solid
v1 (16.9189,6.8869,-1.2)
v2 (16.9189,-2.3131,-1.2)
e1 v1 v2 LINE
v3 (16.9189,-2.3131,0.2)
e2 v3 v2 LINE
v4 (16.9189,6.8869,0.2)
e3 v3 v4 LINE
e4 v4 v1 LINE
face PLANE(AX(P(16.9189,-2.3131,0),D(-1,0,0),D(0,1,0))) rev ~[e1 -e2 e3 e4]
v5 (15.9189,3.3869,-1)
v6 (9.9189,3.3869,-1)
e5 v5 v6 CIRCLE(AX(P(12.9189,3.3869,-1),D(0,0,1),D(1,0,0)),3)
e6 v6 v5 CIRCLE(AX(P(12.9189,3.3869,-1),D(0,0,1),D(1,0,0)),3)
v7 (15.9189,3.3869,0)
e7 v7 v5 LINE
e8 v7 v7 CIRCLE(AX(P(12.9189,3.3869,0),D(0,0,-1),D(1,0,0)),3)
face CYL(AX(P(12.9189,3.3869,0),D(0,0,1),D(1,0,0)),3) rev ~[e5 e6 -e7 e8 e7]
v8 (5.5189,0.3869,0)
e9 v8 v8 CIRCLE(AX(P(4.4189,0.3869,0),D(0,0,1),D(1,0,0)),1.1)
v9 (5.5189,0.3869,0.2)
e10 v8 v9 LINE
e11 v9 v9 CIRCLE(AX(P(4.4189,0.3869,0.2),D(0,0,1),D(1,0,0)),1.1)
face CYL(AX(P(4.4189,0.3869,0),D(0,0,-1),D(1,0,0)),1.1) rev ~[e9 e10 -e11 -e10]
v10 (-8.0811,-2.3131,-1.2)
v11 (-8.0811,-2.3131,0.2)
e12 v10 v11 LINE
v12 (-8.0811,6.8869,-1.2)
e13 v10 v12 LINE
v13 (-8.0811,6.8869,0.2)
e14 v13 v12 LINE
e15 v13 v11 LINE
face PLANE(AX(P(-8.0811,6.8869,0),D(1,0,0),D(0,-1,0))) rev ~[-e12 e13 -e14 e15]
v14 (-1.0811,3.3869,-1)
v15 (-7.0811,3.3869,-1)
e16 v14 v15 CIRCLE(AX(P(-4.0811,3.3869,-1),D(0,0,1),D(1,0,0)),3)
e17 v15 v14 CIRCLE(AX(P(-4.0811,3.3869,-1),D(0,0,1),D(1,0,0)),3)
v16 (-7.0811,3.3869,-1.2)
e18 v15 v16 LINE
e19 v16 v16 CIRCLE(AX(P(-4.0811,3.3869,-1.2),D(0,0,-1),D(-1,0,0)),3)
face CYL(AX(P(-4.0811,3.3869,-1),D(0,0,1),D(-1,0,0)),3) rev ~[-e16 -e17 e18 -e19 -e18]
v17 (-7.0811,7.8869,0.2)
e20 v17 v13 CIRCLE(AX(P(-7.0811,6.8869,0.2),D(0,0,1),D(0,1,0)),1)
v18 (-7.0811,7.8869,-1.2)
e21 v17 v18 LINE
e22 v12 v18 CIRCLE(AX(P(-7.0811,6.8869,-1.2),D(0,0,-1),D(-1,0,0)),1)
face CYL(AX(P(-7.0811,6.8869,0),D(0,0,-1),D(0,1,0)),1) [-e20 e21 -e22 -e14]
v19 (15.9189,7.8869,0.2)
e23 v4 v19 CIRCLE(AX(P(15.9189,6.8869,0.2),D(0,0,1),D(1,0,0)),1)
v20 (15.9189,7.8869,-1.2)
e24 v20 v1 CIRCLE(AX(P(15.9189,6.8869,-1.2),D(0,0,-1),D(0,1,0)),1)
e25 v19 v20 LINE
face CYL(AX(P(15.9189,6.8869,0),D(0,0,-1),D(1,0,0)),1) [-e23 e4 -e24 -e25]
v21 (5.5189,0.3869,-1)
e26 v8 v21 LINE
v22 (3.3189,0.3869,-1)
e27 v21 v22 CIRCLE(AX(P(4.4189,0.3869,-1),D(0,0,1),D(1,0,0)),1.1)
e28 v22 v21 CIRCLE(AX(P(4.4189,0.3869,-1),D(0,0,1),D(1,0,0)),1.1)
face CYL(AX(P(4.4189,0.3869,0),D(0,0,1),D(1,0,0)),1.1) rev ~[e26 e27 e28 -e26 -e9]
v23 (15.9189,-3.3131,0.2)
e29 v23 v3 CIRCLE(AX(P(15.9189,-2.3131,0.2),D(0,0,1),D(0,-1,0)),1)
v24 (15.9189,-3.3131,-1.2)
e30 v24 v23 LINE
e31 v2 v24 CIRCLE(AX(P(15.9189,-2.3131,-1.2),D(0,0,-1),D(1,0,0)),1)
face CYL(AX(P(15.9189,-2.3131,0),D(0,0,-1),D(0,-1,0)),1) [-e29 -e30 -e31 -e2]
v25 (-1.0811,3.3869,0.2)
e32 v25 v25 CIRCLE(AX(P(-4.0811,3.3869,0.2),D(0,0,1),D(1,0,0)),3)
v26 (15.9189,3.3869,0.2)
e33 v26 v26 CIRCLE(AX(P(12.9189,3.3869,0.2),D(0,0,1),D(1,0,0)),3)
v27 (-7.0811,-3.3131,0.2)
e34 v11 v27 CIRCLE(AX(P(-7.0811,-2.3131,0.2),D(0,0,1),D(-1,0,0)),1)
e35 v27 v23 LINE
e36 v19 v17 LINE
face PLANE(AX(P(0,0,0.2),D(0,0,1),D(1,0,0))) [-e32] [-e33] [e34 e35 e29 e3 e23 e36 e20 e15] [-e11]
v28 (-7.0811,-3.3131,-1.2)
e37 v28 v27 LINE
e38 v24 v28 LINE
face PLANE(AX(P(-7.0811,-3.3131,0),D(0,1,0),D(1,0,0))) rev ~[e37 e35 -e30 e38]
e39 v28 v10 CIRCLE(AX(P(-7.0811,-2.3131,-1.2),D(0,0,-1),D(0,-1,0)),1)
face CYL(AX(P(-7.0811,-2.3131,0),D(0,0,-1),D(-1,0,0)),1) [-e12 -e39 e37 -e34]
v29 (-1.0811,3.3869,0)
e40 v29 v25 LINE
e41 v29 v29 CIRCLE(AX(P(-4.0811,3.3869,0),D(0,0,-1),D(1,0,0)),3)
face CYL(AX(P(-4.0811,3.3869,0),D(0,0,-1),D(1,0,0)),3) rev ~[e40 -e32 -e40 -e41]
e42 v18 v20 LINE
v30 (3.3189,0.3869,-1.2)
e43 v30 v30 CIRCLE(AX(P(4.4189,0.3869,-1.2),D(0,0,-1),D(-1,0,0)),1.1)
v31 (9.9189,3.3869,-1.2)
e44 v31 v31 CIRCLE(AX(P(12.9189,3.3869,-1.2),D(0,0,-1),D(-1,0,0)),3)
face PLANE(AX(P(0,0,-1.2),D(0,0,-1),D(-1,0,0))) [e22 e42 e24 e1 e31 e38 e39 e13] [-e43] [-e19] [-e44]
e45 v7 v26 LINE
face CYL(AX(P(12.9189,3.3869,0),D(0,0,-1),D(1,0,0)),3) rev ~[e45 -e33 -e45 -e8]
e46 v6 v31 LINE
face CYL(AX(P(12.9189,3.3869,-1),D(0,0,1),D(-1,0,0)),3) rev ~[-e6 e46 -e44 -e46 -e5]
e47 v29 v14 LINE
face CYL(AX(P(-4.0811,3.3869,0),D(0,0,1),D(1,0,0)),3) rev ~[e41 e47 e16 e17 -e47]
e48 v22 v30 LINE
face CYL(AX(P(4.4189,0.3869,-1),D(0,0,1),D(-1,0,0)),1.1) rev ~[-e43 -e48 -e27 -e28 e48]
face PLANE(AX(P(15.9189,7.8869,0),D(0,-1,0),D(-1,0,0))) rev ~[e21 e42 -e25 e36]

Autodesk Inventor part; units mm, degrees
ref_plane "YZ Plane" through (0, 0, 0) normal (1, 0, 0) x (0, 1, 0)
ref_plane "XZ Plane" through (0, 0, 0) normal (0, 1, 0) x (-1, 0, 0)
ref_plane "XY Plane" through (0, 0, 0) normal (0, 0, 1) x (1, 0, 0)
sketch "Sketch1" plane through (0, 0, 0) normal (0, 0, 1) x (1, 0, 0)
  line L0 (-8.0811, -5.1131) -> (16.9189, -5.1131)
  line L1 (16.9189, -5.1131) -> (16.9189, 19.8869)
  line L2 (16.9189, 19.8869) -> (-8.0811, 19.8869)
  line L3 (-8.0811, 19.8869) -> (-8.0811, -5.1131)
  line L4 (-8.0811, -5.1131) -> (-7.0811, -5.1131)
  line L5 (-7.0811, -5.1131) -> (-7.0811, -4.1131)
  line L6 (-7.0811, -4.1131) -> (-8.0811, -4.1131)
  line L7 (-8.0811, -4.1131) -> (-8.0811, -5.1131)
  line L8 (16.9189, 19.8869) -> (15.9189, 19.8869)
  line L9 (15.9189, 19.8869) -> (15.9189, 18.8869)
  line L10 (15.9189, 18.8869) -> (16.9189, 18.8869)
  line L11 (16.9189, 18.8869) -> (16.9189, 19.8869)
  line L12 (-7.0811, -4.1131) -> (15.9189, -4.1131)
  line L13 (15.9189, -4.1131) -> (15.9189, 18.8869)
  line L14 (15.9189, 18.8869) -> (-7.0811, 18.8869)
  line L15 (-7.0811, 18.8869) -> (-7.0811, -4.1131)
  line L16 (-7.0811, -4.1131) -> (-1.0811, -4.1131)
  line L17 (-1.0811, -4.1131) -> (-1.0811, 17.1845)
  line L18 (-1.0811, 17.1845) -> (-7.0811, 17.1845)
  line L19 (-7.0811, 17.1845) -> (-7.0811, -4.1131)
  line L20 (15.9189, -4.1131) -> (9.9189, -4.1131)
  line L21 (9.9189, -4.1131) -> (9.9189, 17.1845)
  line L22 (9.9189, 17.1845) -> (15.9189, 17.1845)
  line L23 (15.9189, 17.1845) -> (15.9189, -4.1131)
  circle A0 centre (4.4189, 0.3869) radius 5.5
  line L24 (4.4189, 0.3869) -> (15.9189, 0.3869)
  line L25 (4.4189, 0.3869) -> (-8.0811, 0.3869)
  circle A1 centre (-4.0811, 3.3869) radius 3
  circle A2 centre (12.9189, 3.3869) radius 3
  circle A3 centre (4.4189, 0.3869) radius 5
  line L26 (4.4189, -4.6131) -> (4.4189, -3.3131)
  line L27 (4.4189, -3.3131) -> (16.9189, -3.3131)
  line L28 (4.4189, -3.3131) -> (-8.0811, -3.3131)
  line L29 (-4.0811, 6.3869) -> (-4.0811, 8.3869)
  line L30 (-4.0811, 8.3869) -> (16.9189, 8.3869)
  line L31 (-4.0811, 8.3869) -> (-8.0811, 8.3869)
  point P0 (0, 0)
  point P1 (0.3495, -3.3131)
  point P2 (8.4883, -3.3131)
  dimension "d8" = 10
  dimension "d0" = 25
  dimension "d1" = 25
  dimension "d2" = 1
  dimension "d3" = 1
  dimension "d4" = 1
  dimension "d5" = 1
  dimension "d6" = 6
  dimension "d7" = 6
  dimension "d9" = 1.3
  dimension "d10" = 2
extrude "Extrusion1" add sketch "Sketch1" against normal blind 1 contours L3 L25 L15 L28 | L15 L25 L17 L28 | L3 L31 L15 L25 | L27 L13 L30 L1 | L28 L17 A0 | A0 L21 L27 | L15 A1 L25 | L27 L21 L24 L13 | L25 A1 L17 | L17 L30 L21 A0 | L21 A2 L24 | L15 L31 L29 A1 | L13 A2 L21 L30 | L24 A2 L13 | A1 L29 L30 L17
sketch "Sketch3" plane through (0, 0, 0) normal (0, 0, 1) x (1, 0, 0)
  line L0 (-8.0811, 8.3869) -> (-8.0811, -3.3131) projected
  line L1 (-8.0811, -3.3131) -> (0.3495, -3.3131) projected
  arc A0 (8.4883, -3.3131) -> (0.3495, -3.3131) centre (4.4189, 0.3869) ccw projected
  line L2 (8.4883, -3.3131) -> (16.9189, -3.3131) projected
  line L3 (16.9189, -3.3131) -> (16.9189, 8.3869) projected
  line L4 (16.9189, 8.3869) -> (-8.0811, 8.3869) projected
  circle A1 centre (12.9189, 3.3869) radius 3 projected
  circle A2 centre (-4.0811, 3.3869) radius 3 projected
  circle A3 centre (4.4189, 0.3869) radius 1.1 projected
  arc A4 (8.4883, -3.3131) -> (0.3495, -3.3131) centre (4.4189, 0.3869) ccw projected
  line L5 (16.9189, -3.3131) -> (8.4883, -3.3131) projected
  line L6 (0.3495, -3.3131) -> (8.4883, -3.3131)
  point P0 (0, 0)
extrude "Extrusion2" add sketch "Sketch3" against normal blind 1 contours A0 L6
sketch "Sketch4" plane through (0, 0, -1) normal (0, 0, -1) x (-1, 0, 0)
  circle A0 centre (-4.4189, 0.3869) radius 1.1 projected
  line L0 (8.0811, -3.3131) -> (8.0811, 8.3869) projected
  line L1 (8.0811, 8.3869) -> (-16.9189, 8.3869) projected
  line L2 (-16.9189, 8.3869) -> (-16.9189, -3.3131) projected
  line L3 (-16.9189, -3.3131) -> (8.0811, -3.3131) projected
  circle A1 centre (-12.9189, 3.3869) radius 3 projected
  circle A2 centre (4.0811, 3.3869) radius 3 projected
  circle A3 centre (-12.9189, 3.3869) radius 4
  line L4 (-16.9189, 8.3869) -> (-16.9189, -3.3131) projected
  line L5 (-12.9189, 7.3869) -> (-12.9189, 8.3869)
  line L6 (-12.9189, 7.8869) -> (-16.9189, 7.8869)
  line L7 (-12.9189, 7.8869) -> (8.0811, 7.8869)
  line L8 (8.0811, -3.3131) -> (8.0811, 8.3869) projected
  point P0 (0, 0)
  point P1 (8.0811, 7.8869)
extrude "Extrusion3" cut sketch "Sketch4" against normal blind 1 contours L7 L5 L1 L0 | L6 L2 L1 L5
fillet "Fillet1" radius 1 4 edges at (16.9189, 7.8869, -0.5) (16.9189, -3.3131, -0.5) (-8.0811, 7.8869, -0.5) (-8.0811, -3.3131, -0.5)
sketch "Sketch5" plane through (0, 0, -1) normal (0, 0, -1) x (-1, 0, 0)
  circle A0 centre (4.0811, 3.3869) radius 3 projected
  circle A1 centre (-12.9189, 3.3869) radius 3 projected
  circle A2 centre (-4.4189, 0.3869) radius 1.1 projected
  arc A3 (7.0811, -3.3131) -> (8.0811, -2.3131) centre (7.0811, -2.3131) ccw projected
  line L0 (8.0811, -2.3131) -> (8.0811, 6.8869) projected
  arc A4 (8.0811, 6.8869) -> (7.0811, 7.8869) centre (7.0811, 6.8869) ccw projected
  line L1 (7.0811, 7.8869) -> (-15.9189, 7.8869) projected
  arc A5 (-15.9189, 7.8869) -> (-16.9189, 6.8869) centre (-15.9189, 6.8869) ccw projected
  line L2 (-16.9189, 6.8869) -> (-16.9189, -2.3131) projected
  arc A6 (-16.9189, -2.3131) -> (-15.9189, -3.3131) centre (-15.9189, -2.3131) ccw projected
  line L3 (-15.9189, -3.3131) -> (7.0811, -3.3131) projected
  point P0 (0, 0)
extrude "Extrusion4" add sketch "Sketch5" along normal blind 0.2
sketch "Sketch6" plane through (0, 0, 0) normal (0, 0, 1) x (1, 0, 0)
  arc A0 (-8.0811, -2.3131) -> (-7.0811, -3.3131) centre (-7.0811, -2.3131) ccw projected
  line L0 (-7.0811, -3.3131) -> (15.9189, -3.3131) projected
  arc A1 (15.9189, -3.3131) -> (16.9189, -2.3131) centre (15.9189, -2.3131) ccw projected
  line L1 (16.9189, -2.3131) -> (16.9189, 6.8869) projected
  arc A2 (16.9189, 6.8869) -> (15.9189, 7.8869) centre (15.9189, 6.8869) ccw projected
  line L2 (15.9189, 7.8869) -> (-7.0811, 7.8869) projected
  arc A3 (-7.0811, 7.8869) -> (-8.0811, 6.8869) centre (-7.0811, 6.8869) ccw projected
  line L3 (-8.0811, 6.8869) -> (-8.0811, -2.3131) projected
  circle A4 centre (4.4189, 0.3869) radius 1.1 projected
  circle A5 centre (12.9189, 3.3869) radius 3 projected
  circle A6 centre (-4.0811, 3.3869) radius 3 projected
  point P0 (0, 0)
extrude "Extrusion5" add sketch "Sketch6" along normal blind 0.2
properties part number "bok"
